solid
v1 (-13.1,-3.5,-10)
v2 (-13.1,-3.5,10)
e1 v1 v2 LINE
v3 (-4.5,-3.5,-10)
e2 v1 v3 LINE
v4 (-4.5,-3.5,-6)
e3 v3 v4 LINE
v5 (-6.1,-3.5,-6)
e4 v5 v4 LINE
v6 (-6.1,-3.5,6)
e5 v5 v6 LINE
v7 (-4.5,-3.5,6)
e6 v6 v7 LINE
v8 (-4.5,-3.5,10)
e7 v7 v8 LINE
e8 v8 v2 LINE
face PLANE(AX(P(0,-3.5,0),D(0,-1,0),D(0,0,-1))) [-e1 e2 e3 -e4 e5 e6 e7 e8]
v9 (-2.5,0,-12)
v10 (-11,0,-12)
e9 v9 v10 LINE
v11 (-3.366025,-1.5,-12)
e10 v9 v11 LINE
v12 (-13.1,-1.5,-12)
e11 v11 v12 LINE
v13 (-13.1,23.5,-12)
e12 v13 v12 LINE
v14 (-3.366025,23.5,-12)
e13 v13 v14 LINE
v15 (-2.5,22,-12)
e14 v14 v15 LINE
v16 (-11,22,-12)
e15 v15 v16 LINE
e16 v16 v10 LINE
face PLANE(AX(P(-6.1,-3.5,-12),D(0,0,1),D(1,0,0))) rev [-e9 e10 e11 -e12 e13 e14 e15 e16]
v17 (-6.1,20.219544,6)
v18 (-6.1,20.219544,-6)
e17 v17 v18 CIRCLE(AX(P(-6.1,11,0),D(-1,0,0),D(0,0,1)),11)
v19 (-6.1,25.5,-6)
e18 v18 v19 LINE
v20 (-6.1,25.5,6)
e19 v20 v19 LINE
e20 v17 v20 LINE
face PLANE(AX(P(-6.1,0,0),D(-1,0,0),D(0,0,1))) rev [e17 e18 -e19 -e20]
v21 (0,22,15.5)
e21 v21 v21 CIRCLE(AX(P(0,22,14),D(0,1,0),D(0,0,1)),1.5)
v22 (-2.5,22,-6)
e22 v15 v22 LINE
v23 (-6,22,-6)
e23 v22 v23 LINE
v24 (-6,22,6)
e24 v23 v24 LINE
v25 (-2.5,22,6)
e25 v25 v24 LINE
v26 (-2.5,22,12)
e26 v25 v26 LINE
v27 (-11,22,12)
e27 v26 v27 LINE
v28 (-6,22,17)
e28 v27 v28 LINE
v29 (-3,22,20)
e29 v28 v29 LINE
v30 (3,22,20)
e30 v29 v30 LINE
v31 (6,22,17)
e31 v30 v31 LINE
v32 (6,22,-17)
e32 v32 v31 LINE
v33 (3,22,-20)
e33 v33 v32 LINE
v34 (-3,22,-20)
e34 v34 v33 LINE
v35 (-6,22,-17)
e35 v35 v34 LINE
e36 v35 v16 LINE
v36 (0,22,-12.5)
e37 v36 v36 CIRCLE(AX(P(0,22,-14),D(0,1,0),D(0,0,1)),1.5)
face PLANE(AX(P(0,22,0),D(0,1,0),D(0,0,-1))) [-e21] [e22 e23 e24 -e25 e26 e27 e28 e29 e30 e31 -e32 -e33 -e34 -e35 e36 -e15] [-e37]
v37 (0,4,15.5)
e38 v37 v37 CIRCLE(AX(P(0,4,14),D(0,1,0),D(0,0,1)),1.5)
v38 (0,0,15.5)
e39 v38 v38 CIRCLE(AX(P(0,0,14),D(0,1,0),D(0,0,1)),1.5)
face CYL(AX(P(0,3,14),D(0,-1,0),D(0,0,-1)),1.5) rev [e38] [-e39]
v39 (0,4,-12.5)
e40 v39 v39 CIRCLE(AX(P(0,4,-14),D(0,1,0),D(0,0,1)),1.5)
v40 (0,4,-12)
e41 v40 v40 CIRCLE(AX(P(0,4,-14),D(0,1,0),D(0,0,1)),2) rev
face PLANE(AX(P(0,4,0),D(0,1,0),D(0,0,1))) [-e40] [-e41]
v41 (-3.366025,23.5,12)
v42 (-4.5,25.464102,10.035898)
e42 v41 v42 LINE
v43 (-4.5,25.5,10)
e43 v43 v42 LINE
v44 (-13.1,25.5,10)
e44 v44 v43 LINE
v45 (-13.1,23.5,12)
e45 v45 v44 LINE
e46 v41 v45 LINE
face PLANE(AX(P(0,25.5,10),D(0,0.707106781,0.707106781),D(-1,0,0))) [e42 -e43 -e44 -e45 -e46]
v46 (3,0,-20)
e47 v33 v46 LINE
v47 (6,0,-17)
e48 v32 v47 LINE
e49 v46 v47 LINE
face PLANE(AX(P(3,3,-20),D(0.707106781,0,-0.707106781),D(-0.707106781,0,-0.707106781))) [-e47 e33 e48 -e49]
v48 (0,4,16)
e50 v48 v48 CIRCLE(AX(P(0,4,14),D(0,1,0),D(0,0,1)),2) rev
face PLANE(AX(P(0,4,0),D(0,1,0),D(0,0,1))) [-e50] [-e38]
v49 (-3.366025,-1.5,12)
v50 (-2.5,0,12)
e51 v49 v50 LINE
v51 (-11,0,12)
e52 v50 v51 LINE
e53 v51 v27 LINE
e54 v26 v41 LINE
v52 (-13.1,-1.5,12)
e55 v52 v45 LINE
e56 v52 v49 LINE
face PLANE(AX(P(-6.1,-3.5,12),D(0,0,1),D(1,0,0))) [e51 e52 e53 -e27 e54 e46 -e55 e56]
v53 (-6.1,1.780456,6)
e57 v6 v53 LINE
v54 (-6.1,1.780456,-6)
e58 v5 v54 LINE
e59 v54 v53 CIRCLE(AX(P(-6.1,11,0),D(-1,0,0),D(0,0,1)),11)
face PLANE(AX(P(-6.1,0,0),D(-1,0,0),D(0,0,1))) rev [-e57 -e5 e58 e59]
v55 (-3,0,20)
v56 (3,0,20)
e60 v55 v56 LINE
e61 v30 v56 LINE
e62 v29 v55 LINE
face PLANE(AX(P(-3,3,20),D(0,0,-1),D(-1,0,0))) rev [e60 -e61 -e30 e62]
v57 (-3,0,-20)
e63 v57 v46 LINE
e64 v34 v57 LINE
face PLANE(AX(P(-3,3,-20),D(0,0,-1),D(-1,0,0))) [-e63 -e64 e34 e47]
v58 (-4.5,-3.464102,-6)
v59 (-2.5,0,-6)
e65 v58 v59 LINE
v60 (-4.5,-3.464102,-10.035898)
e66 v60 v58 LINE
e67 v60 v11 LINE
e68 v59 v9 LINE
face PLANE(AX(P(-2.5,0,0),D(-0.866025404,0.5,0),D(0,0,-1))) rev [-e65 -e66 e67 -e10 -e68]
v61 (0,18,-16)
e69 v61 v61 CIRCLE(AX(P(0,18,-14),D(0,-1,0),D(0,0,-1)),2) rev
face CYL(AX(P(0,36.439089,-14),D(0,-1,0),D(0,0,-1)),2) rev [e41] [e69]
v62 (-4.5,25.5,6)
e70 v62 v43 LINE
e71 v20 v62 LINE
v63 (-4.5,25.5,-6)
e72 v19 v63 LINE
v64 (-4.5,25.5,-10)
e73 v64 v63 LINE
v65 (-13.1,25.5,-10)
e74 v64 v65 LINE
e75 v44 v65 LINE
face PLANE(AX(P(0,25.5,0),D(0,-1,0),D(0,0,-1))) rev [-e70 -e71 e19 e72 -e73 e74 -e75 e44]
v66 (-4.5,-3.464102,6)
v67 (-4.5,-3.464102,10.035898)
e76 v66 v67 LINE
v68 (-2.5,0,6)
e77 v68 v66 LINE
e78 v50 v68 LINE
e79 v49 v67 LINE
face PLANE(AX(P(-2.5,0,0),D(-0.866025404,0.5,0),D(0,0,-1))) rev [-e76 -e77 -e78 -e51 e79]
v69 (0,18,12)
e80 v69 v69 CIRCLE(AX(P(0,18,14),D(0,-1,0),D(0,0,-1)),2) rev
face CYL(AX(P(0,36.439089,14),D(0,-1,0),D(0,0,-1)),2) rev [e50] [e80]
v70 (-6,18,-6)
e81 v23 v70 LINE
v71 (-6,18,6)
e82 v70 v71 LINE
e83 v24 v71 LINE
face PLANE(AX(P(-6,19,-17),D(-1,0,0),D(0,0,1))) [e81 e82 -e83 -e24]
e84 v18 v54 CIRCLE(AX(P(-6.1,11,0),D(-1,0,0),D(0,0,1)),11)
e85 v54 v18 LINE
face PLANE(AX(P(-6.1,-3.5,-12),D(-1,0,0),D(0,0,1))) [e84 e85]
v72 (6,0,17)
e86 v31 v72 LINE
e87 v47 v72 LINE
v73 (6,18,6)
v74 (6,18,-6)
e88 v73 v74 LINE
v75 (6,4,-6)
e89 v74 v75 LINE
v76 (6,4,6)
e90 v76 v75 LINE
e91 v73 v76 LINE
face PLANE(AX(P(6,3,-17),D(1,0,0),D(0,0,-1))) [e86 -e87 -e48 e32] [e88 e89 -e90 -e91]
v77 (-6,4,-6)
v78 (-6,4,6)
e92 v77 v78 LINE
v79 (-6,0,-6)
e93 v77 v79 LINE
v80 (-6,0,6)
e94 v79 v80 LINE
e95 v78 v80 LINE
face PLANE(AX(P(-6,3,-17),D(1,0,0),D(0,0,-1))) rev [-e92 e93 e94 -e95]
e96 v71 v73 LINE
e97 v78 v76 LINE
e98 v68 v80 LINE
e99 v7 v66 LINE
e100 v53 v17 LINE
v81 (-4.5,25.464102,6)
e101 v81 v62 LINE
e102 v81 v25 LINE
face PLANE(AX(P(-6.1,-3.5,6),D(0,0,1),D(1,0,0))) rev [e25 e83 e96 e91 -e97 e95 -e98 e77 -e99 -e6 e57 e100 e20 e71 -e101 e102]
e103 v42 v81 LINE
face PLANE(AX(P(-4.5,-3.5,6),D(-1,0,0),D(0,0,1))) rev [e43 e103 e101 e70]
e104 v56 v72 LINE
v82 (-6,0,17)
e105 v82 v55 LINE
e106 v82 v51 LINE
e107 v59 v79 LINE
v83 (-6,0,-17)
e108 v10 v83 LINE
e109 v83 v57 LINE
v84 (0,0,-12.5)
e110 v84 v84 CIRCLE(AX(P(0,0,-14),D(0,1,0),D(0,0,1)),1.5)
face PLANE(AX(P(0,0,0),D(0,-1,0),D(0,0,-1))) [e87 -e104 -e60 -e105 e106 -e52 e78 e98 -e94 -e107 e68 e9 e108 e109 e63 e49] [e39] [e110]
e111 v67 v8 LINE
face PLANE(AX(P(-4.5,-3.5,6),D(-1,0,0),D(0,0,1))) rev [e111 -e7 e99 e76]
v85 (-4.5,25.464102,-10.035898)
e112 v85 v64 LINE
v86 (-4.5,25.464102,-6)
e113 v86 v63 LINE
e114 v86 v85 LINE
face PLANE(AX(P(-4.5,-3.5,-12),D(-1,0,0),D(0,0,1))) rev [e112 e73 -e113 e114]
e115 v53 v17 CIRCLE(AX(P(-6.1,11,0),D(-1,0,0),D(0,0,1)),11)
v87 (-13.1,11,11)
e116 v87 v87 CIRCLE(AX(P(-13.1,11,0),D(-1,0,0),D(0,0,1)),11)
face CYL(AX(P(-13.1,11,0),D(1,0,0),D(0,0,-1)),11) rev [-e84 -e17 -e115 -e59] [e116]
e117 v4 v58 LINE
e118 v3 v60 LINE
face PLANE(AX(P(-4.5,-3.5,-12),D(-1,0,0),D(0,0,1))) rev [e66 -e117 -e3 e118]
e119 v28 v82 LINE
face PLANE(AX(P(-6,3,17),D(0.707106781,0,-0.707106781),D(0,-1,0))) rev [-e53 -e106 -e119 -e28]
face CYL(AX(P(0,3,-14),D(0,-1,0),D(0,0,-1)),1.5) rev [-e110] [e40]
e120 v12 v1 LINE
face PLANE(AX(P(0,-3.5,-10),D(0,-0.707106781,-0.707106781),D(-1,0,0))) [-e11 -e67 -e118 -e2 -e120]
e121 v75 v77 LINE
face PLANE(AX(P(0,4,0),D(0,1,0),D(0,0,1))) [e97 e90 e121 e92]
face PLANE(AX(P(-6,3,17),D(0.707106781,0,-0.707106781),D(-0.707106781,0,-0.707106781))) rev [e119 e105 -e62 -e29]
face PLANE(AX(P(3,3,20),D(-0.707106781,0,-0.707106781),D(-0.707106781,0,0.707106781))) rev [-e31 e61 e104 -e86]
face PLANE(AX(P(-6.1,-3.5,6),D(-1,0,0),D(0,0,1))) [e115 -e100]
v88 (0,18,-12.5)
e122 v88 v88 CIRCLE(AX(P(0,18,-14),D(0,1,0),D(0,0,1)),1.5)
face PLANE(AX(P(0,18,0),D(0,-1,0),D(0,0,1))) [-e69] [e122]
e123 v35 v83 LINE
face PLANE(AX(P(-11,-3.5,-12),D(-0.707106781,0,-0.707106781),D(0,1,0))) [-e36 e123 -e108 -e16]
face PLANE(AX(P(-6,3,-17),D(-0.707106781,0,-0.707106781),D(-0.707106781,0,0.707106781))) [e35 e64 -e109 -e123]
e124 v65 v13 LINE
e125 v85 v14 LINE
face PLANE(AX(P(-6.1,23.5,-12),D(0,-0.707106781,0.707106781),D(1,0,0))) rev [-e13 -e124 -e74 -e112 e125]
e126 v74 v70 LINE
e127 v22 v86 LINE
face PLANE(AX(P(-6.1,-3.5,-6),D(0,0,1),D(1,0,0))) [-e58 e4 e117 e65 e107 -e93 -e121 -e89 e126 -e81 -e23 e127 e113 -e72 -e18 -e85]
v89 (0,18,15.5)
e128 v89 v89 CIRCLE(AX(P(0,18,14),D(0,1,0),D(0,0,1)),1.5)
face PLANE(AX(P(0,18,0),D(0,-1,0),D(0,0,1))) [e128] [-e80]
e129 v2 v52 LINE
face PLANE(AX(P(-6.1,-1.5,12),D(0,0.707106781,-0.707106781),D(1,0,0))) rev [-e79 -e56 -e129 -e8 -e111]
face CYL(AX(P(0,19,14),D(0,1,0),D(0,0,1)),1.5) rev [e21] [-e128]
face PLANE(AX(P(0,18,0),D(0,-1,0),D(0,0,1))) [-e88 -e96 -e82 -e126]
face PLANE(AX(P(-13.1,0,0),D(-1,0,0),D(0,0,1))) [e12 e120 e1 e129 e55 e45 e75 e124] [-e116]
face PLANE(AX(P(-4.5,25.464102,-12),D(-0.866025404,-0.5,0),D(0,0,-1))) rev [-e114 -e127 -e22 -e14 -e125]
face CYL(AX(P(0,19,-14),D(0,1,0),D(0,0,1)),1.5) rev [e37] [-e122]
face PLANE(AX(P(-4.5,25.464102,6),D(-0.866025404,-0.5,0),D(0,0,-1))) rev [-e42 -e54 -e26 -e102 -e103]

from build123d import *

# Parameters (mm, degrees)
SKETCH1_R                 = 1.5
BOSS_EXTRUDE1_DEPTH       = 3
BOSS_EXTRUDE2_START       = 22.5
SKETCH2_W                 = 1.6
SKETCH2_H                 = 6
BOSS_EXTRUDE2_DEPTH       = 29
SKETCH4_R                 = 1.5
BOSS_EXTRUDE5_DEPTH       = 1
CHAMFER2_SIZE             = 2
CHAMFER2_SIZE2            = 3.464101615
SKETCH3_W                 = 24
SKETCH3_H                 = 29
SKETCH3_R                 = 11
BOSS_EXTRUDE4_DEPTH       = 7
CHAMFER3_SIZE             = 2
CHAMFER2_OF_MIRROR1_SIZE2 = 2
CHAMFER2_OF_MIRROR1_SIZE  = 3.464101615
SKETCH5_R                 = 2
BOSS_EXTRUDE6_DEPTH       = 14
CHAMFER5_SIZE             = 5


with BuildPart() as part:
    # Sketch1 → Boss-Extrude1 (new body)
    with BuildSketch(Plane(origin=(0, 0, 0), x_dir=(1, 0, 0), z_dir=(0, 1, 0))):
        Polygon((-6, 17), (-3, 20), (3, 20), (6, 17), (6, -17), (3, -20), (-3, -20), (-6, -17), align=None)
        with Locations(Location((0, 14, 0), (0, 0, 270))):
            Circle(SKETCH1_R, mode=Mode.SUBTRACT)
        with Locations(Location((0, -14, 0), (0, 0, 270))):
            Circle(SKETCH1_R, mode=Mode.SUBTRACT)
    boss_extrude1 = extrude(amount=BOSS_EXTRUDE1_DEPTH)

    # Sketch2 → Boss-Extrude2 (add)
    with BuildSketch(Plane(origin=(0, 3, 0), x_dir=(1, 0, 0), z_dir=(0, 1, 0)).offset(BOSS_EXTRUDE2_START)):
        with Locations((-5.3, 9)):
            Rectangle(SKETCH2_W, SKETCH2_H)
        with Locations((-5.3, -9)):
            Rectangle(SKETCH2_W, SKETCH2_H)
    extrude(amount=-BOSS_EXTRUDE2_DEPTH)

    # Sketch4 → Boss-Extrude5 (add)
    with BuildSketch(Plane(origin=(0, 3, 0), x_dir=(1, 0, 0), z_dir=(0, 1, 0))):
        Polygon((-3, 20), (-6, 17), (-6, 12), (-4.5, 12), (-4.5, 6), (-6, 6), (-6, -6), (-4.5, -6), (-4.5, -12), (-6, -12), (-6, -17), (-3, -20), (3, -20), (6, -17), (6, 17), (3, 20), align=None)
        with Locations(Location((0, 14, 0), (0, 0, 270))):
            Circle(SKETCH4_R, mode=Mode.SUBTRACT)
        with Locations(Location((0, -14, 0), (0, 0, 270))):
            Circle(SKETCH4_R, mode=Mode.SUBTRACT)
    boss_extrude5 = extrude(amount=BOSS_EXTRUDE5_DEPTH)

    # Chamfer2
    chamfer2_edges = [part.edges().sort_by_distance(p)[0] for p in [
        (-4.5, 0, 9),
        (-4.5, 0, -9),
    ]]
    chamfer2_side = [part.faces().sort_by_distance(p)[0] for p in [
        (0.219837568, 0, 0),
    ]]
    chamfer(chamfer2_edges, length=CHAMFER2_SIZE, length2=CHAMFER2_SIZE2, reference=chamfer2_side[0])

    # Sketch3 → Boss-Extrude4 (add)
    with BuildSketch(Plane.ZY.offset(6.1)):
        with Locations((0, 11)):
            Rectangle(SKETCH3_W, SKETCH3_H)
        with Locations(Location((0, 11, 0), (0, 0, 236.944268849))):
            Circle(SKETCH3_R, mode=Mode.SUBTRACT)
    extrude(amount=BOSS_EXTRUDE4_DEPTH)

    # Chamfer3
    chamfer3_edges = [part.edges().sort_by_distance(p)[0] for p in [
        (-8.8, 25.5, -12),
        (-8.8, -3.5, -12),
        (-8.8, -3.5, 12),
        (-8.8, 25.5, 12),
    ]]
    chamfer(chamfer3_edges, length=CHAMFER3_SIZE)

    # Mirror1: Boss-Extrude1, Boss-Extrude5 across plane
    add(boss_extrude1.mirror(Plane(origin=(0, 11, 0), x_dir=(0, 0, 1), z_dir=(0, -1, 0))))
    add(boss_extrude5.mirror(Plane(origin=(0, 11, 0), x_dir=(0, 0, 1), z_dir=(0, -1, 0))))

    # Chamfer2 of Mirror1
    chamfer2_of_mirror1_edges = [part.edges().sort_by_distance(p)[0] for p in [
        (-4.5, 22, 9),
        (-4.5, 22, -9),
    ]]
    chamfer(chamfer2_of_mirror1_edges, length=CHAMFER2_OF_MIRROR1_SIZE, length2=CHAMFER2_OF_MIRROR1_SIZE2)

    # Sketch5 → Boss-Extrude6 (add)
    # profile 1 of 2: a face of its own
    with BuildSketch(Plane(origin=(0, 4, 0), x_dir=(1, 0, 0), z_dir=(0, 1, 0))):
        Polygon((6, -6), (-6, -6), (-6, -17), (-3, -20), (3, -20), (6, -17), align=None)
        with Locations(Location((0, -14, 0), (0, 0, 90))):
            Circle(SKETCH5_R, mode=Mode.SUBTRACT)
    # profile 2 of 2: a face of its own
    with BuildSketch(Plane(origin=(0, 4, 0), x_dir=(1, 0, 0), z_dir=(0, 1, 0))):
        Polygon((-6, 17), (-6, 6), (6, 6), (6, 17), (3, 20), (-3, 20), align=None)
        with Locations(Location((0, 14, 0), (0, 0, 90))):
            Circle(SKETCH5_R, mode=Mode.SUBTRACT)
    extrude(amount=BOSS_EXTRUDE6_DEPTH)

    # Chamfer5
    chamfer5_edges = [part.edges().sort_by_distance(p)[0] for p in [
        (-6, 11, 12),
        (-6, 11, -12),
    ]]
    chamfer(chamfer5_edges, length=CHAMFER5_SIZE - 0.0001)  # a hair under: the kernel refuses the full size


solid = part.part
